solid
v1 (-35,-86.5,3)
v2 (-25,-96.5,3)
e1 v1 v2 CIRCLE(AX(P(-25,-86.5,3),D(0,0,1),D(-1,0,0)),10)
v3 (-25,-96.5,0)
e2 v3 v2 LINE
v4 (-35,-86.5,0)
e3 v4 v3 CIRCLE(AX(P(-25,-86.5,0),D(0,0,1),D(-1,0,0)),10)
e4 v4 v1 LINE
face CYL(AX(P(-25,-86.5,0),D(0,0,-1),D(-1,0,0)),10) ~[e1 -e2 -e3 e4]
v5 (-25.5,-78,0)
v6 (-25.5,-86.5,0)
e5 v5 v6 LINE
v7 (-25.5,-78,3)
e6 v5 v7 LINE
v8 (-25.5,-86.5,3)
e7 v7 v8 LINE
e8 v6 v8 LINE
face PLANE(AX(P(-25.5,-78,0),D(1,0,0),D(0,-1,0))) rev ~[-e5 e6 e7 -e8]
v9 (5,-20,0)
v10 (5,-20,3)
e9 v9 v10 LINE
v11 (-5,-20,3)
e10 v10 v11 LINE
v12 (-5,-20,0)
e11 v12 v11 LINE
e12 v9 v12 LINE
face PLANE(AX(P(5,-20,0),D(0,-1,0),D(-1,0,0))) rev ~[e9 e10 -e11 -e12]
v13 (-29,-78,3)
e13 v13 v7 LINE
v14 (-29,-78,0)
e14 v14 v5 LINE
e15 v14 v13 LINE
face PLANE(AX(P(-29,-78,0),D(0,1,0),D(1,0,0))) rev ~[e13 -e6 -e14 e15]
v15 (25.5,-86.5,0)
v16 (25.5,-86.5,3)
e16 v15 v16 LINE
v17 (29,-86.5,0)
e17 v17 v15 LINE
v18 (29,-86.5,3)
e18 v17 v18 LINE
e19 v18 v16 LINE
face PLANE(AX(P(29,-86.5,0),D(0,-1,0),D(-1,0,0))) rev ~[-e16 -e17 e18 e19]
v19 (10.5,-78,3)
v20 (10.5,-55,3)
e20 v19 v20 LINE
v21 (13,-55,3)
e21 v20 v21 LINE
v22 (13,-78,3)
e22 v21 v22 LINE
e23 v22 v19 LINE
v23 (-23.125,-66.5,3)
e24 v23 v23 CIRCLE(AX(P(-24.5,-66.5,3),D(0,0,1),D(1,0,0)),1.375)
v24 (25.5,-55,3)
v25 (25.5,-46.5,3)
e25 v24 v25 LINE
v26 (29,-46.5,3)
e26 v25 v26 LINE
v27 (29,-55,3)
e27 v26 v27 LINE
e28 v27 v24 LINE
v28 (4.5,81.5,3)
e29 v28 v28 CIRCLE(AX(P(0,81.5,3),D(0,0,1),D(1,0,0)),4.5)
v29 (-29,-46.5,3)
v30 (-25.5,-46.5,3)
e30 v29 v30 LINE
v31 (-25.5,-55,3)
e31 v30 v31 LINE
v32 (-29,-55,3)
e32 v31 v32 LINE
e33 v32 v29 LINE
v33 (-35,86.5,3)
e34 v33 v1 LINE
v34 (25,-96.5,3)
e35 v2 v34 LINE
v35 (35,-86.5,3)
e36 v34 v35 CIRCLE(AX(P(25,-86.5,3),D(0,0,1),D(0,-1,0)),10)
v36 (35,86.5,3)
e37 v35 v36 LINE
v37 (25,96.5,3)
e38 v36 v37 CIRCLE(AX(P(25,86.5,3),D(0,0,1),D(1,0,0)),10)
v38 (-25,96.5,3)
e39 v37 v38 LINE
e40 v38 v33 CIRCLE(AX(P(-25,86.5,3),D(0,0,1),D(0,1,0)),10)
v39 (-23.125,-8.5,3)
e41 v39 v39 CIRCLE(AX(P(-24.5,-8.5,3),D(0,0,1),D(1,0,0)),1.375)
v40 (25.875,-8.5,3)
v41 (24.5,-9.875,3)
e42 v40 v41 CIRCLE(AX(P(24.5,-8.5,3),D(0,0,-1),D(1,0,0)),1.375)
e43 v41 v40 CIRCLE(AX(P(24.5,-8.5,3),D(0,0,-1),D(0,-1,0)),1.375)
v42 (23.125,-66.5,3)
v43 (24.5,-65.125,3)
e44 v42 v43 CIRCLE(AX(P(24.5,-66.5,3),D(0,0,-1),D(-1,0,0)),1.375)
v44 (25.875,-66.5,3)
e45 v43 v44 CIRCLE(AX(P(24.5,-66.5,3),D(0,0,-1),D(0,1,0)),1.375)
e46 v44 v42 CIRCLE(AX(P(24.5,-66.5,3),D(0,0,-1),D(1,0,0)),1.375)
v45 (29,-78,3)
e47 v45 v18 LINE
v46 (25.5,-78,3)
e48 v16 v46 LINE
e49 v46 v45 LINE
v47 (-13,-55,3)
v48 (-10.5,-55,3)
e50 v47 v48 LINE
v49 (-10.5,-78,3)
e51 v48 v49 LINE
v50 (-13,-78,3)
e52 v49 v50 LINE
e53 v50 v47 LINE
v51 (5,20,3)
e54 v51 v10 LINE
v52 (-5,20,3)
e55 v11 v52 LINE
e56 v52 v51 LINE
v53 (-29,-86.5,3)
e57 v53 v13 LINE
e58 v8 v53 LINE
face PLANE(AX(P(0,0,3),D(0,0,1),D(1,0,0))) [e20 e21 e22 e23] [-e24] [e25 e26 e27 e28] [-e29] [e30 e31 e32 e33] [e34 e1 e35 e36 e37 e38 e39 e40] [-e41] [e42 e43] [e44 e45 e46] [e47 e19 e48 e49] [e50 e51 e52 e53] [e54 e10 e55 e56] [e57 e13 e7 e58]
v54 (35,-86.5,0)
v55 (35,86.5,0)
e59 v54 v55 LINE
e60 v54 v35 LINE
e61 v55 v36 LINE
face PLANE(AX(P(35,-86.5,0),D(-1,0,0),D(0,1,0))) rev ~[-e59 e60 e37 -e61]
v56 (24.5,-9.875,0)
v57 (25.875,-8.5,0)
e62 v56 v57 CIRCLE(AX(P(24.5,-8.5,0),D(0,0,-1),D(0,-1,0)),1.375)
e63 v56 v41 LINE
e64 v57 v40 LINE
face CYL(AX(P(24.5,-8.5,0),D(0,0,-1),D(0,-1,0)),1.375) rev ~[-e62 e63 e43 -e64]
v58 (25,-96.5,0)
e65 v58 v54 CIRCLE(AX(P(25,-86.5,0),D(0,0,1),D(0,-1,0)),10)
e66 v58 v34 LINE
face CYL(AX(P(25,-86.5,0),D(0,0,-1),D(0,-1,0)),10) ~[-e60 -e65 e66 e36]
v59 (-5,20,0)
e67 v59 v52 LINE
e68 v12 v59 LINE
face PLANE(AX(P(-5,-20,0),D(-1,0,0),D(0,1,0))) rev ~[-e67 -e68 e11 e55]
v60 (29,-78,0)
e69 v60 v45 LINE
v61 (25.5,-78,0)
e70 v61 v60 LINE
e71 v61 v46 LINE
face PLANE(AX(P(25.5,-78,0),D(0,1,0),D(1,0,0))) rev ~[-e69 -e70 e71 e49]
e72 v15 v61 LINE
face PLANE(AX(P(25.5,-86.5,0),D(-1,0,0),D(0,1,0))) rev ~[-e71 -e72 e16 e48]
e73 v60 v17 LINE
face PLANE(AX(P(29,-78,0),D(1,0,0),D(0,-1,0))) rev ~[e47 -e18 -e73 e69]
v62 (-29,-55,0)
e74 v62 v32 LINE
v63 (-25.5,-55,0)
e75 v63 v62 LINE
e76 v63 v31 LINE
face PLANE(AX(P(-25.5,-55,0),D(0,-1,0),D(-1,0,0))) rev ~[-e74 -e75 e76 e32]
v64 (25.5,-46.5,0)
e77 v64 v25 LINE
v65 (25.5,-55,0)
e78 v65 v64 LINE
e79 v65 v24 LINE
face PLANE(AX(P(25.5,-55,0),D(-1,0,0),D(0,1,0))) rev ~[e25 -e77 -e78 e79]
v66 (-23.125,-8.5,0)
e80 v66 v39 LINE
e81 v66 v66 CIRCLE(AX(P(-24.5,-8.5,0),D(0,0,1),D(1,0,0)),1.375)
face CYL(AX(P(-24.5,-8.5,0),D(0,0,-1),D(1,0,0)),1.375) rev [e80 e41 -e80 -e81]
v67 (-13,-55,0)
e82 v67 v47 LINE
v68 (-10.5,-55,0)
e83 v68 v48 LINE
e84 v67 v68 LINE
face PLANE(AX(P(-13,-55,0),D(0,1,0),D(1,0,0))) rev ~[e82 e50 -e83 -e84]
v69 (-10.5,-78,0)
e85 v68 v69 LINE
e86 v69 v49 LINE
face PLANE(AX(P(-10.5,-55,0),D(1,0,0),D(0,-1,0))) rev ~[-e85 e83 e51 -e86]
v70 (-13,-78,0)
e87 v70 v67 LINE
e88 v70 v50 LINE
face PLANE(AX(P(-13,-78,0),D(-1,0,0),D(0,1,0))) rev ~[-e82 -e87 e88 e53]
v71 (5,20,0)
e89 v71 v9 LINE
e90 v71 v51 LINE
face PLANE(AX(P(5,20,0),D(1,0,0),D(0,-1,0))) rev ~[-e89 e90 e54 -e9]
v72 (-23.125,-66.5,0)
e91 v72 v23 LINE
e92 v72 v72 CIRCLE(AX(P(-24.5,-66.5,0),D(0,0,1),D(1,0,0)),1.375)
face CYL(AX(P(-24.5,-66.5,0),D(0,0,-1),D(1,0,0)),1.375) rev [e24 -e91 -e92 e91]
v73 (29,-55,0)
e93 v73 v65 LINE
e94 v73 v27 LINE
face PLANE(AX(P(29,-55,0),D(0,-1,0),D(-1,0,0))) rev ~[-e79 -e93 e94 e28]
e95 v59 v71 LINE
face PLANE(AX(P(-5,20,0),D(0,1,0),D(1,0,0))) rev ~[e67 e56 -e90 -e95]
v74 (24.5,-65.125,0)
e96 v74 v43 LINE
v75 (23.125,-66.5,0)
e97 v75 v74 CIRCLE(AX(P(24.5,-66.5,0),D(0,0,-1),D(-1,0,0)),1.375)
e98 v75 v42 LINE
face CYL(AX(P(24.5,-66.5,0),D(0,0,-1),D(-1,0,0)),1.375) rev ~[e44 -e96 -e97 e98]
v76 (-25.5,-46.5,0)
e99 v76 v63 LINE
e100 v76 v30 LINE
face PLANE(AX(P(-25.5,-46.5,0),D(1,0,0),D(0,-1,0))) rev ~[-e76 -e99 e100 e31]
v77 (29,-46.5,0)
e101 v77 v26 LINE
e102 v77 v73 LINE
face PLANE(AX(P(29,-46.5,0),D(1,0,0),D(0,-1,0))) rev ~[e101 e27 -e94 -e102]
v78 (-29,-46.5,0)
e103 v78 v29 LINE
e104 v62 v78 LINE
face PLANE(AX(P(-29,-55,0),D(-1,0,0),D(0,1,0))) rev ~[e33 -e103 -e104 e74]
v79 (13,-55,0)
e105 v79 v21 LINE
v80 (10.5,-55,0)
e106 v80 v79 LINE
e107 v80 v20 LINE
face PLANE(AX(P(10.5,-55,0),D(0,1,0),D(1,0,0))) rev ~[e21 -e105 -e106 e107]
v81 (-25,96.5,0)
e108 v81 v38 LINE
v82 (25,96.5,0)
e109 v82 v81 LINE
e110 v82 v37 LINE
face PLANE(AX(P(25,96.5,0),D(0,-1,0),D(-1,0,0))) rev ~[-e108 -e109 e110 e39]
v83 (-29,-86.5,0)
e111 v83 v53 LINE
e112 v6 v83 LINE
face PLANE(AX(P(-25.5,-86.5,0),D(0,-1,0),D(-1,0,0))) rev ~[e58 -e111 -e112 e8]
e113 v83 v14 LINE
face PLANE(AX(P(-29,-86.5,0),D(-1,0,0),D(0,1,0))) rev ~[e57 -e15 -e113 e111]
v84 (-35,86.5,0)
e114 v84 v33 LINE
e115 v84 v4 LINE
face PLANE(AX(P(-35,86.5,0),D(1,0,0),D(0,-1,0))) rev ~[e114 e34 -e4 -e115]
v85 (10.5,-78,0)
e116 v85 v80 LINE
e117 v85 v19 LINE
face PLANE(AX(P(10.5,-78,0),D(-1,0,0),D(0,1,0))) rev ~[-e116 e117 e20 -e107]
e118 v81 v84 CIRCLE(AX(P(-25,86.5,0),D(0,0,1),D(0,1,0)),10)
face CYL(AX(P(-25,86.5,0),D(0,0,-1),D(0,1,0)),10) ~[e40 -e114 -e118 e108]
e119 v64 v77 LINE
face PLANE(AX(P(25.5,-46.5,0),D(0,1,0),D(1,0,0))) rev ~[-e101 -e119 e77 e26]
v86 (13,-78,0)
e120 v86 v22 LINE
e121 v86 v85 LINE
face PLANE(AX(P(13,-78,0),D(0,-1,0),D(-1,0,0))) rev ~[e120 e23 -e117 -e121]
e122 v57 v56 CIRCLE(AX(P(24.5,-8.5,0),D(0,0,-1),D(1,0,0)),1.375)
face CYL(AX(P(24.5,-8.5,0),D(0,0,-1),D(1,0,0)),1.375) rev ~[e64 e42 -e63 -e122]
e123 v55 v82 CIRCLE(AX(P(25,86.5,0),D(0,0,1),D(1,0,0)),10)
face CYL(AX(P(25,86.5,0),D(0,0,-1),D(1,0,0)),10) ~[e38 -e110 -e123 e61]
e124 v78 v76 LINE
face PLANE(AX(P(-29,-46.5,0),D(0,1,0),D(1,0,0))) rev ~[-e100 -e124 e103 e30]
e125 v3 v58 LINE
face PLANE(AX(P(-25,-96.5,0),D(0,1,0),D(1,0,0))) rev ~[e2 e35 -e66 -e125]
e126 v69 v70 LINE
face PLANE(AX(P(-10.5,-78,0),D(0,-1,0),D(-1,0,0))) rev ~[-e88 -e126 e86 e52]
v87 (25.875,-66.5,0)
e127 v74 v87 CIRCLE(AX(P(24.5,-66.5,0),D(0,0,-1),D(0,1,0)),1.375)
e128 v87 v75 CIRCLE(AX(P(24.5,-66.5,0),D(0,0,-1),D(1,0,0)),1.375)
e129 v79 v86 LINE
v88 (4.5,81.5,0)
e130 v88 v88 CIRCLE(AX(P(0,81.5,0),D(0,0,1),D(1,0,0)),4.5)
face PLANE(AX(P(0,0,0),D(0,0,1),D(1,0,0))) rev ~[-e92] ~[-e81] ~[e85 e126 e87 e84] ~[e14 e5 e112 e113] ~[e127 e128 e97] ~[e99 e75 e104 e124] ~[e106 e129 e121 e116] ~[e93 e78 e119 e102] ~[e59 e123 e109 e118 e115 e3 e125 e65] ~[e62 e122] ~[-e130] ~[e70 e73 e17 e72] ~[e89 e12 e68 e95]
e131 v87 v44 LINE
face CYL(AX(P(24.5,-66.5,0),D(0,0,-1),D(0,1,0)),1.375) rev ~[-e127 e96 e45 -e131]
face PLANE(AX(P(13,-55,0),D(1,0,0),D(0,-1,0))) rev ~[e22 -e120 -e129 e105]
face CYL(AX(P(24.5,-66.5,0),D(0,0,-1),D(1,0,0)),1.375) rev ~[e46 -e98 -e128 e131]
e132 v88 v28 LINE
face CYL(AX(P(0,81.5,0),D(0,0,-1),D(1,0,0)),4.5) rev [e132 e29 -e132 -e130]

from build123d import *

# Parameters (mm, degrees)
F0_R     = 1.375
F0_R_2   = 4.5
F0_W     = 40
F0_H     = 10
F0_W_2   = 10
F0_H_2   = 35
F0_W_3   = 15
F0_H_3   = 2
F0_W_4   = 2
F0_W_5   = 5.5
F0_H_4   = 11.5
F0_R_3   = 1
F1_DEPTH = 3


# Not quite as in the source:
# - a feature names something its author has since deleted; it is built from what else it names


with BuildPart() as f1:
    # F0 (on Top) → F1 (new body)
    with BuildSketch(Plane.XY):
        with BuildLine():
            Line((25, 96.5), (-25, 96.5))
            ThreePointArc((-25, 96.5), (-32.0710678119, 93.5710678119), (-35, 86.5))
            Line((-35, 86.5), (-35, -86.5))
            ThreePointArc((-35, -86.5), (-32.0710678119, -93.5710678119), (-25, -96.5))
            Line((-25, -96.5), (25, -96.5))
            ThreePointArc((25, -96.5), (32.0710678119, -93.5710678119), (35, -86.5))
            Line((35, -86.5), (35, 86.5))
            ThreePointArc((35, 86.5), (32.0710678119, 93.5710678119), (25, 96.5))
        make_face()
        Polygon((-29, -86.5), (-29, -78), (-29, -55), (-29, -46.5), (-25.5, -46.5), (-25.5, -55), (-18.5, -55), (-13, -55), (-10.5, -55), (-10.5, -66.5), (-10.5, -78), (-10.5, -86.5), (-25.5, -86.5), align=None, mode=Mode.SUBTRACT)
        with Locations((-24.5, -8.5)):
            Circle(F0_R, mode=Mode.SUBTRACT)
        Polygon((10.5, -78), (10.5, -66.5), (10.5, -55), (13, -55), (18.5, -55), (24.5, -55), (25.5, -55), (25.5, -46.5), (29, -46.5), (29, -55), (29, -78), (29, -86.5), (25.5, -86.5), (10.5, -86.5), align=None, mode=Mode.SUBTRACT)
        with BuildLine():
            ThreePointArc((25.875, -8.5), (25.4722718241, -9.4722718241), (24.5, -9.875))
            ThreePointArc((24.5, -9.875), (23.5277281759, -7.5277281759), (25.875, -8.5))
        make_face(mode=Mode.SUBTRACT)
        with BuildLine():
            ThreePointArc((26, -30), (25.5980762114, -31.5), (24.5, -32.5980762114))
            ThreePointArc((24.5, -32.5980762114), (23.1822131445, -32.9944612821), (21.8260869565, -32.7607839768))
            ThreePointArc((21.8260869565, -32.7607839768), (0, -52), (-21.8260869565, -32.7607839768))
            ThreePointArc((-21.8260869565, -32.7607839768), (-26, -30), (-21.8260869565, -27.2392160232))
            ThreePointArc((-21.8260869565, -27.2392160232), (-16.3398685927, -15.268785034), (-5, -8.5757147144))
            Line((-5, -8.5757147144), (-5, -5.5))
            Line((-5, -5.5), (-14, -5.5))
            Line((-14, -5.5), (-14, -8.5))
            ThreePointArc((-14, -8.5), (-17, -11.5), (-20, -8.5))
            Line((-20, -8.5), (-20, -5.5))
            Line((-20, -5.5), (-30, -5.5))
            Line((-30, -5.5), (-32, -5.5))
            Line((-32, -5.5), (-32, 6.5))
            Line((-32, 6.5), (-32, 41.5))
            Line((-32, 41.5), (-32, 53.5))
            Line((-32, 53.5), (-30, 53.5))
            Line((-30, 53.5), (-30, 56.5))
            ThreePointArc((-30, 56.5), (-27, 59.5), (-24, 56.5))
            Line((-24, 56.5), (-24, 53.5))
            Line((-24, 53.5), (-20, 53.5))
            Line((-20, 53.5), (20, 53.5))
            Line((20, 53.5), (32, 53.5))
            Line((32, 53.5), (32, 41.5))
            Line((32, 41.5), (32, 6.5))
            Line((32, 6.5), (32, -5.5))
            Line((32, -5.5), (20, -5.5))
            Line((20, -5.5), (5, -5.5))
            Line((5, -5.5), (5, -8.5757147144))
            ThreePointArc((5, -8.5757147144), (16.3398685927, -15.268785034), (21.8260869565, -27.2392160232))
            ThreePointArc((21.8260869565, -27.2392160232), (23.1822131445, -27.0055387179), (24.5, -27.4019237886))
            ThreePointArc((24.5, -27.4019237886), (25.5980762114, -28.5), (26, -30))
        make_face(mode=Mode.SUBTRACT)
        with Locations((0, 81.5)):
            Circle(F0_R_2, mode=Mode.SUBTRACT)
        Polygon((5, 20), (5, 6.5), (20, 6.5), (20, 41.5), (-20, 41.5), (-20, 6.5), (-5, 6.5), (-5, 20), align=None)
        with BuildLine():
            ThreePointArc((-20, -30), (0, -50), (20, -30))
            ThreePointArc((20, -30), (15.8113883008, -17.7525512861), (5, -10.635083269))
            Line((5, -10.635083269), (5, -20))
            Line((5, -20), (-5, -20))
            Line((-5, -20), (-5, -10.635083269))
            ThreePointArc((-5, -10.635083269), (-15.8113883008, -17.7525512861), (-20, -30))
        make_face()
        with Locations((0, 46.5)):
            Rectangle(F0_W, F0_H)
        with Locations((-25, 24)):
            Rectangle(F0_W_2, F0_H_2)
        with Locations((25, 24)):
            Rectangle(F0_W_2, F0_H_2)
        Polygon((-29, -55), (-29, -78), (-25.5, -78), (-18.5, -78), (-18.5, -66.5), (-18.5, -55), (-25.5, -55), align=None)
        with Locations((-24.5, -66.5)):
            Circle(F0_R, mode=Mode.SUBTRACT)
        with BuildLine():
            Line((23.125, -66.5), (18.5, -66.5))
            Line((18.5, -66.5), (18.5, -78))
            Line((18.5, -78), (25.5, -78))
            Line((25.5, -78), (29, -78))
            Line((29, -78), (29, -55))
            Line((29, -55), (25.5, -55))
            Line((25.5, -55), (24.5, -55))
            Line((24.5, -55), (24.5, -65.125))
            ThreePointArc((24.5, -65.125), (25.4722718241, -65.5277281759), (25.875, -66.5))
            ThreePointArc((25.875, -66.5), (24.5, -67.875), (23.125, -66.5))
        make_face()
        with Locations((-12.5, 1.5)):
            Rectangle(F0_W_3, F0_H)
        with Locations((12.5, 1.5)):
            Rectangle(F0_W_3, F0_H)
        Polygon((-18.5, -78), (-25.5, -78), (-25.5, -86.5), (-10.5, -86.5), (-10.5, -78), (-13, -78), align=None)
        Polygon((13, -78), (10.5, -78), (10.5, -86.5), (25.5, -86.5), (25.5, -78), (18.5, -78), align=None)
        with BuildLine():
            ThreePointArc((-21.8260869565, -32.7607839768), (0, -52), (21.8260869565, -32.7607839768))
            ThreePointArc((21.8260869565, -32.7607839768), (20.4978270313, -31.6550318531), (20, -30))
            ThreePointArc((20, -30), (0, -50), (-20, -30))
            ThreePointArc((-20, -30), (-20.4978270313, -31.6550318531), (-21.8260869565, -32.7607839768))
        make_face()
        with Locations((25, 46.5)):
            Rectangle(F0_W_2, F0_H)
        with Locations((-25, 46.5)):
            Rectangle(F0_W_2, F0_H)
        with Locations((-25, 1.5)):
            Rectangle(F0_W_2, F0_H)
        with Locations((25, 1.5)):
            Rectangle(F0_W_2, F0_H)
        with Locations((0, 52.5)):
            Rectangle(F0_W, F0_H_3)
        with Locations((31, 24)):
            Rectangle(F0_W_4, F0_H_2)
        with Locations((-31, 24)):
            Rectangle(F0_W_4, F0_H_2)
        with BuildLine():
            Line((18.5, -55), (18.5, -66.5))
            Line((18.5, -66.5), (23.125, -66.5))
            ThreePointArc((23.125, -66.5), (23.5277281759, -65.5277281759), (24.5, -65.125))
            Line((24.5, -65.125), (24.5, -55))
            Line((24.5, -55), (18.5, -55))
        make_face()
        with Locations((-15.75, -72.25)):
            Rectangle(F0_W_5, F0_H_4)
        with Locations((-15.75, -60.75)):
            Rectangle(F0_W_5, F0_H_4)
        with Locations((15.75, -72.25)):
            Rectangle(F0_W_5, F0_H_4)
        with Locations((15.75, -60.75)):
            Rectangle(F0_W_5, F0_H_4)
        with BuildLine():
            ThreePointArc((-5, -8.5757147144), (-16.3398685927, -15.268785034), (-21.8260869565, -27.2392160232))
            ThreePointArc((-21.8260869565, -27.2392160232), (-20.4978270313, -28.3449681469), (-20, -30))
            ThreePointArc((-20, -30), (-15.8113883008, -17.7525512861), (-5, -10.635083269))
            Line((-5, -10.635083269), (-5, -8.5757147144))
        make_face()
        with BuildLine():
            ThreePointArc((20, -30), (20.4978270313, -28.3449681469), (21.8260869565, -27.2392160232))
            ThreePointArc((21.8260869565, -27.2392160232), (16.3398685927, -15.268785034), (5, -8.5757147144))
            Line((5, -8.5757147144), (5, -10.635083269))
            ThreePointArc((5, -10.635083269), (15.8113883008, -17.7525512861), (20, -30))
        make_face()
        Polygon((30, 41.5), (32, 41.5), (32, 53.5), (20, 53.5), (20, 51.5), (30, 51.5), align=None)
        Polygon((20, -3.5), (20, -5.5), (32, -5.5), (32, 6.5), (30, 6.5), (30, -3.5), align=None)
        Polygon((-14, -5.5), (-5, -5.5), (-5, -3.5), (-20, -3.5), (-20, -5.5), (-17, -5.5), align=None)
        with Locations((12.5, -4.5)):
            Rectangle(F0_W_3, F0_H_3)
        with BuildLine():
            ThreePointArc((-30, 56.5), (-29.1213203519, 54.3786796648), (-27.0000000236, 53.5))
            ThreePointArc((-27.0000000236, 53.5), (-24.8786796648, 54.3786796481), (-24, 56.5))
            ThreePointArc((-24, 56.5), (-27, 59.5), (-30, 56.5))
        make_face()
        with Locations((-27, 56.5)):
            Circle(F0_R_3, mode=Mode.SUBTRACT)
        with BuildLine():
            ThreePointArc((-14, -8.5), (-14.8786796564, -6.3786796564), (-17, -5.5))
            ThreePointArc((-17, -5.5), (-19.1213203436, -6.3786796564), (-20, -8.5))
            ThreePointArc((-20, -8.5), (-17, -11.5), (-14, -8.5))
        make_face()
        with Locations((-17, -8.5)):
            Circle(F0_R_3, mode=Mode.SUBTRACT)
        Polygon((-32, 41.5), (-30, 41.5), (-30, 51.5), (-30, 53.5), (-32, 53.5), align=None)
        Polygon((-30, -5.5), (-30, -3.5), (-30, 6.5), (-32, 6.5), (-32, -5.5), align=None)
        with BuildLine():
            ThreePointArc((-21.8260869565, -27.2392160232), (-26, -30), (-21.8260869565, -32.7607839768))
            ThreePointArc((-21.8260869565, -32.7607839768), (-21.9564786913, -31.3831281496), (-22, -30))
            ThreePointArc((-22, -30), (-21.9564786913, -28.6168718504), (-21.8260869565, -27.2392160232))
        make_face()
        with Locations((-23, -30)):
            Circle(F0_R_3, mode=Mode.SUBTRACT)
        Polygon((-30, 51.5), (-20, 51.5), (-20, 53.5), (-24, 53.5), (-27.0000000236, 53.5), (-30, 53.5), align=None)
        with Locations((-25, -4.5)):
            Rectangle(F0_W_2, F0_H_3)
        with BuildLine():
            ThreePointArc((21.8260869565, -32.7607839768), (23.1822131445, -32.9944612821), (24.5, -32.5980762114))
            Line((24.5, -32.5980762114), (24.5, -27.4019237886))
            ThreePointArc((24.5, -27.4019237886), (23.1822131445, -27.0055387179), (21.8260869565, -27.2392160232))
            ThreePointArc((21.8260869565, -27.2392160232), (21.9564786913, -28.6168718504), (22, -30))
            ThreePointArc((22, -30), (21.9564786913, -31.3831281496), (21.8260869565, -32.7607839768))
        make_face()
        with BuildLine():
            ThreePointArc((24, -30), (23, -31), (22, -30))
            ThreePointArc((22, -30), (23, -29), (24, -30))
        make_face(mode=Mode.SUBTRACT)
        with BuildLine():
            ThreePointArc((-22, -30), (-21.9564786913, -31.3831281496), (-21.8260869565, -32.7607839768))
            ThreePointArc((-21.8260869565, -32.7607839768), (-20.4978270313, -31.6550318531), (-20, -30))
            ThreePointArc((-20, -30), (-20.4978270313, -28.3449681469), (-21.8260869565, -27.2392160232))
            ThreePointArc((-21.8260869565, -27.2392160232), (-21.9564786913, -28.6168718504), (-22, -30))
        make_face()
        with BuildLine():
            ThreePointArc((20, -30), (20.4978270313, -31.6550318531), (21.8260869565, -32.7607839768))
            ThreePointArc((21.8260869565, -32.7607839768), (21.9564786913, -31.3831281496), (22, -30))
            ThreePointArc((22, -30), (21.9564786913, -28.6168718504), (21.8260869565, -27.2392160232))
            ThreePointArc((21.8260869565, -27.2392160232), (20.4978270313, -28.3449681469), (20, -30))
        make_face()
        with BuildLine():
            Line((24.5, -27.4019237886), (24.5, -32.5980762114))
            ThreePointArc((24.5, -32.5980762114), (25.5980762114, -31.5), (26, -30))
            ThreePointArc((26, -30), (25.5980762114, -28.5), (24.5, -27.4019237886))
        make_face()
        with Locations((-23, -30)):
            Circle(F0_R_3)
        with BuildLine():
            ThreePointArc((24, -30), (23, -29), (22, -30))
            ThreePointArc((22, -30), (23, -31), (24, -30))
        make_face()
        with Locations((-27, 56.5)):
            Circle(F0_R_3)
        with Locations((-17, -8.5)):
            Circle(F0_R_3)
        with BuildLine():
            Line((-27.0000000236, 53.5), (-24, 53.5))
            Line((-24, 53.5), (-24, 56.5))
            ThreePointArc((-24, 56.5), (-24.8786796648, 54.3786796481), (-27.0000000236, 53.5))
        make_face()
        with BuildLine():
            Line((-30, 56.5), (-30, 53.5))
            Line((-30, 53.5), (-27.0000000236, 53.5))
            ThreePointArc((-27.0000000236, 53.5), (-29.1213203519, 54.3786796648), (-30, 56.5))
        make_face()
        with BuildLine():
            ThreePointArc((-20, -8.5), (-19.1213203436, -6.3786796564), (-17, -5.5))
            Line((-17, -5.5), (-20, -5.5))
            Line((-20, -5.5), (-20, -8.5))
        make_face()
        with BuildLine():
            Line((-14, -8.5), (-14, -5.5))
            Line((-14, -5.5), (-17, -5.5))
            ThreePointArc((-17, -5.5), (-14.8786796564, -6.3786796564), (-14, -8.5))
        make_face()
    extrude(amount=F1_DEPTH)


solid = f1.part
